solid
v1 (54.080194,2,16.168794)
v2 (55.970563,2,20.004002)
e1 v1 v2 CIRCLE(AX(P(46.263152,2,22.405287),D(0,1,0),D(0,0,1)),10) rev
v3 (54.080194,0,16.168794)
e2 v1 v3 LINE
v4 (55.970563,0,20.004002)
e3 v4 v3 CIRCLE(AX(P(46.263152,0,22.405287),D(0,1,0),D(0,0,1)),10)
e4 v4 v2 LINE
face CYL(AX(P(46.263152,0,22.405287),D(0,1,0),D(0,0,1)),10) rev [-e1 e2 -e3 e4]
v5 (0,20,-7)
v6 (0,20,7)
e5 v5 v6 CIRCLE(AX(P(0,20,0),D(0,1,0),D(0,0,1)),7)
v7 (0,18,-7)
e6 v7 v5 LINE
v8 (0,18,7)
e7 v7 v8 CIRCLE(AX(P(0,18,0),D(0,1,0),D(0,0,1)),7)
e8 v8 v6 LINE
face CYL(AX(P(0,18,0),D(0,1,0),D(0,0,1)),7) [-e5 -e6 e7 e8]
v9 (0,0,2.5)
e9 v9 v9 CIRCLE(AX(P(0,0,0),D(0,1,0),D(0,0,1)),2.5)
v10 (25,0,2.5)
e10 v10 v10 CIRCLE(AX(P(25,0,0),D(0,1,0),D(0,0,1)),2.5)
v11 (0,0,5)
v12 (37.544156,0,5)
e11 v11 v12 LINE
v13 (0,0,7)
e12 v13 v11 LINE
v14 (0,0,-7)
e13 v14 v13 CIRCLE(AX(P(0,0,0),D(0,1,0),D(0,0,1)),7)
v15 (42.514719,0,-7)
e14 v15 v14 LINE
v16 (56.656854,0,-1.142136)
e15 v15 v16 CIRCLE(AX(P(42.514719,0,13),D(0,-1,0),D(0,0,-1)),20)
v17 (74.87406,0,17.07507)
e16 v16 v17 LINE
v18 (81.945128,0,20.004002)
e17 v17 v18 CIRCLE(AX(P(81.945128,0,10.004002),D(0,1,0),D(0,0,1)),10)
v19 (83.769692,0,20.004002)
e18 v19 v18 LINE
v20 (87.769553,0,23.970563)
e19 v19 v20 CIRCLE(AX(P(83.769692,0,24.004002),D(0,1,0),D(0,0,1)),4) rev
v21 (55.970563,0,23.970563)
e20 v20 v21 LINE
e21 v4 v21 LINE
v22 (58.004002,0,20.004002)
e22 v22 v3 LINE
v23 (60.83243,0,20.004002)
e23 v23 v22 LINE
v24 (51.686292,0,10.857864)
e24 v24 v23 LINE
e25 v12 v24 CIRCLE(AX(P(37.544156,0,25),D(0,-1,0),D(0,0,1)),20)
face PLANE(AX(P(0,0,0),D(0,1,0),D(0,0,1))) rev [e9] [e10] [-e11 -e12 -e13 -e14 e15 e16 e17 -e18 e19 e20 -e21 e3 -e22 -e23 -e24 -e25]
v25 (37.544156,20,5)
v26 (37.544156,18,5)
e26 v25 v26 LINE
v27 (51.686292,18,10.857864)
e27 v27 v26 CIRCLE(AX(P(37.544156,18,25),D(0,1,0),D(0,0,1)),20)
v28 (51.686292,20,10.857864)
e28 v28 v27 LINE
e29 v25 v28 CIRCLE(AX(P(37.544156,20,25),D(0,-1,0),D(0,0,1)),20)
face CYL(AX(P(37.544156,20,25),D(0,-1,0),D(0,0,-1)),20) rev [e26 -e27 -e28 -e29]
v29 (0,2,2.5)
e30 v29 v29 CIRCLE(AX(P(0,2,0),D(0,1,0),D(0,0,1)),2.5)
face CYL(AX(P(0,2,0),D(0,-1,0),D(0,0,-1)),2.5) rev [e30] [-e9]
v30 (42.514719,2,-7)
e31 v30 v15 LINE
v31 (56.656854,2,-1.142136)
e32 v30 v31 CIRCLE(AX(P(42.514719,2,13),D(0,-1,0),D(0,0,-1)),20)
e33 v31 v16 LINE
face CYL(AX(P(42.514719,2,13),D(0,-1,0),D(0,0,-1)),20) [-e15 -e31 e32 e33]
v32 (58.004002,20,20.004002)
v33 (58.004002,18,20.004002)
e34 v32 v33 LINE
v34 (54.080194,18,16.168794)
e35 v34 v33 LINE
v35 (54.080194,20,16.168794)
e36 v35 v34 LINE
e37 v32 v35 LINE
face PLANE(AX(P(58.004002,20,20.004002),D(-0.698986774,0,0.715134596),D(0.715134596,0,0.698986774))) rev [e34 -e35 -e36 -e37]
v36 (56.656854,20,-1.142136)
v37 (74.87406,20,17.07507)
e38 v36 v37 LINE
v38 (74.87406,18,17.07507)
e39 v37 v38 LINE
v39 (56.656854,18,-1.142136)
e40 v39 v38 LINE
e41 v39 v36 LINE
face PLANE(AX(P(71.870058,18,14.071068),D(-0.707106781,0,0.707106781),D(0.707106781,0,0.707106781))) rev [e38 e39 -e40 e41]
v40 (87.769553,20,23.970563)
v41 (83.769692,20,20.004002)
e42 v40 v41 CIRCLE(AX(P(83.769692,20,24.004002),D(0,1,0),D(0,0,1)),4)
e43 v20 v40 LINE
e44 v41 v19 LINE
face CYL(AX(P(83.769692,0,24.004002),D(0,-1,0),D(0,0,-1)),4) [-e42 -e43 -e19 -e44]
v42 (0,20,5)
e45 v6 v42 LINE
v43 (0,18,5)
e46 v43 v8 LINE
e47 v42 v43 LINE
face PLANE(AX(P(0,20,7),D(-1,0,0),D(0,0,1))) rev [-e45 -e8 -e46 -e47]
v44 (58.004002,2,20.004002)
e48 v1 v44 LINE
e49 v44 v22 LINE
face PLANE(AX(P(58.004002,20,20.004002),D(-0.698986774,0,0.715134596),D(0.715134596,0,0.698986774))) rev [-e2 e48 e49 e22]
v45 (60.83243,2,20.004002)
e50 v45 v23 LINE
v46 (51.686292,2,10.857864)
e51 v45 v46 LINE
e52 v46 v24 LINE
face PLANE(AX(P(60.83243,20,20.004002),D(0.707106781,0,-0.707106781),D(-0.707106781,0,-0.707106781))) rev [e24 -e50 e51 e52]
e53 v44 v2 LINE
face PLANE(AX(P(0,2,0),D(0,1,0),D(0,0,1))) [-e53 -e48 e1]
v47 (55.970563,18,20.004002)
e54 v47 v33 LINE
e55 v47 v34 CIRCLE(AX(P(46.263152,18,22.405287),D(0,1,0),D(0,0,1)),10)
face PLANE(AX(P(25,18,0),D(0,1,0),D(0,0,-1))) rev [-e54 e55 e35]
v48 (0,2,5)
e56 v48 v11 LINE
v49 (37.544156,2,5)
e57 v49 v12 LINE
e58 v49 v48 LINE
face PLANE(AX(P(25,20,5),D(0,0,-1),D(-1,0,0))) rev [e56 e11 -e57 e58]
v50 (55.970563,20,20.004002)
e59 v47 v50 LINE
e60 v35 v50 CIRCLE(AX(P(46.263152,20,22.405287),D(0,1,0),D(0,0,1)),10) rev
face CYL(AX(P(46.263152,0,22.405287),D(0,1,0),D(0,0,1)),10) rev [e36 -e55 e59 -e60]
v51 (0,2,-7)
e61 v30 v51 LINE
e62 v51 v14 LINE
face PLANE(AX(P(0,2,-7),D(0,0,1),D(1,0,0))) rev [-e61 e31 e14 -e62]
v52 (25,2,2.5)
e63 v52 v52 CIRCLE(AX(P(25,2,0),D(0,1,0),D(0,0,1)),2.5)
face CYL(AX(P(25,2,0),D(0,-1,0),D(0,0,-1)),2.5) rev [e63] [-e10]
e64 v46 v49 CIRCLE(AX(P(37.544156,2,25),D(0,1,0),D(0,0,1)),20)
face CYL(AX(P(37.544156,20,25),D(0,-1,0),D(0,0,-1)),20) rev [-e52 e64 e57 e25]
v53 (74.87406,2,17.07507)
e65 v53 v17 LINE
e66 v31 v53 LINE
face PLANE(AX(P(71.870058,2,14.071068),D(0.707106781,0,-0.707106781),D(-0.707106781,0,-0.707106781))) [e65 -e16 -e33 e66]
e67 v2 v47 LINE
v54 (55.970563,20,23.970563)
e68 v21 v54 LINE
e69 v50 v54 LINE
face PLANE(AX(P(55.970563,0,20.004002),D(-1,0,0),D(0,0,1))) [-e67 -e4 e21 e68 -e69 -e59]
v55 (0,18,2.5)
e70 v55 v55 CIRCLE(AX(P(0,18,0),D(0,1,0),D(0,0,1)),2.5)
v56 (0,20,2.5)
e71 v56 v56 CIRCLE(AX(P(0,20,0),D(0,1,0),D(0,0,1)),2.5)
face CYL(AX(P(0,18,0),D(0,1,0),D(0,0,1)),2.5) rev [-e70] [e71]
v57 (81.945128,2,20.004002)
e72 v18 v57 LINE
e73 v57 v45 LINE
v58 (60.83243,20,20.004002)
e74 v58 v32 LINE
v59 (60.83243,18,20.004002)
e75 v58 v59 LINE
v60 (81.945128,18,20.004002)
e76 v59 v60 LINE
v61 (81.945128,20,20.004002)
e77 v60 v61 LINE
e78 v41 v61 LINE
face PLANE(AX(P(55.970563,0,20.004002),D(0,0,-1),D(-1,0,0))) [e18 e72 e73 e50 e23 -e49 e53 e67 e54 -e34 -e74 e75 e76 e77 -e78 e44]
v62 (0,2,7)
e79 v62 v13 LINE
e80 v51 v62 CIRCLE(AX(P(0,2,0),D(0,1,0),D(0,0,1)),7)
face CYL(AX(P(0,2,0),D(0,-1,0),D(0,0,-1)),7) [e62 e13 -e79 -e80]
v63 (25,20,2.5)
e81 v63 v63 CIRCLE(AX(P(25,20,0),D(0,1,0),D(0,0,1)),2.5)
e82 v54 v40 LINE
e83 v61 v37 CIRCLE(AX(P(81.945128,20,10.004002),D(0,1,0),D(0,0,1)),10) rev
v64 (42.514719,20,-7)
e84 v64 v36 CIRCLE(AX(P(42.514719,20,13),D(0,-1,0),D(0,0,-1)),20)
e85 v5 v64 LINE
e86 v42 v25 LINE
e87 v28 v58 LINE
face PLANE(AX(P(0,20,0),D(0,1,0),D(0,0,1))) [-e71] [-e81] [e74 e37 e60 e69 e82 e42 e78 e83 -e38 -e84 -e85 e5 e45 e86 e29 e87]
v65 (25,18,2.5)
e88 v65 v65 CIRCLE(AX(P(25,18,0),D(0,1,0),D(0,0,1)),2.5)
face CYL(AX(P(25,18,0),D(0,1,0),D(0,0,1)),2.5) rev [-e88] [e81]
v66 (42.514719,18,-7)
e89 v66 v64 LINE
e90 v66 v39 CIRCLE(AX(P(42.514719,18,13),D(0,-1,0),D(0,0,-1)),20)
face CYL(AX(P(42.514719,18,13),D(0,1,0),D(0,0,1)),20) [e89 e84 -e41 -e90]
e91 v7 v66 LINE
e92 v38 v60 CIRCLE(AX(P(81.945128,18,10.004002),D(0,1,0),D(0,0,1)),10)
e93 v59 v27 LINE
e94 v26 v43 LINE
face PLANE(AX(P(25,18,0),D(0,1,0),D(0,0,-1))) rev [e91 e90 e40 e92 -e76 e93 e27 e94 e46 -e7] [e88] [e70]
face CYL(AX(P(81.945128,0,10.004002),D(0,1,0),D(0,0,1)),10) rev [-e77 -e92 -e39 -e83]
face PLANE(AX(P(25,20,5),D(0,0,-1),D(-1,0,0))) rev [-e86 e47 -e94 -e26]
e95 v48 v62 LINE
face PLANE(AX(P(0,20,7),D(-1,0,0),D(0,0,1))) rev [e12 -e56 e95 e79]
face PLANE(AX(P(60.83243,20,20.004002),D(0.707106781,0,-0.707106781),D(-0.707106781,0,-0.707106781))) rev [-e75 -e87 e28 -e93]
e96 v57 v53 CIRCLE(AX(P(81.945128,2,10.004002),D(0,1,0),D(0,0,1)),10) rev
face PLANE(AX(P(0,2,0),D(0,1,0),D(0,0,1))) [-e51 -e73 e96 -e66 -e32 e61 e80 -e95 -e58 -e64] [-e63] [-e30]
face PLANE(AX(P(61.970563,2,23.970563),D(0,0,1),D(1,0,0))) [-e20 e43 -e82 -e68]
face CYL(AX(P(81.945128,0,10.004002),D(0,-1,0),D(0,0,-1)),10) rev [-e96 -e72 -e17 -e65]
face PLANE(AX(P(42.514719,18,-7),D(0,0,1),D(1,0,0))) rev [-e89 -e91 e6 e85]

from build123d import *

# Parameters (mm, degrees)
SKETCH1_R                = 2.5
BOSS_EXTRUDE1_DEPTH      = 2
BOSS_EXTRUDE2_DEPTH      = 2
BOSS_EXTRUDE3_DEPTH      = 18
BOSS_EXTRUDE3_DEPTH_BACK = 2
SKETCH4_W                = 31.798989874
SKETCH4_H                = 3.966560298
BOSS_EXTRUDE5_START      = -2
SKETCH6_R                = 2.5
BOSS_EXTRUDE5_DEPTH      = 2
FILLET1_R                = 10
FILLET2_R                = 10
FILLET4_R                = 4
CUT_EXTRUDE1_DEPTH       = 94.156093248


with BuildPart() as part:
    # Sketch1 → Boss-Extrude1 (new body)
    with BuildSketch(Plane(origin=(0, 0, 0), x_dir=(1, 0, 0), z_dir=(0, 1, 0))):
        with BuildLine():
            Line((0, 7), (25, 7))
            ThreePointArc((25, 7), (32, 0), (25, -7))
            Line((25, -7), (0, -7))
            ThreePointArc((0, -7), (-7, 0), (0, 7))
        make_face()
        with Locations(Location((0, 0, 0), (0, 0, 270))):
            Circle(SKETCH1_R, mode=Mode.SUBTRACT)
        with Locations(Location((25, 0, 0), (0, 0, 270))):
            Circle(SKETCH1_R, mode=Mode.SUBTRACT)
    extrude(amount=BOSS_EXTRUDE1_DEPTH)

    # Sketch3 → Boss-Extrude2 (add)
    with BuildSketch(Plane(origin=(0, 0, 0), x_dir=(-1, 0, 0), z_dir=(0, -1, 0))):
        with BuildLine():
            Line((-25, -7), (-36.715728753, -7))
            ThreePointArc((-36.715728753, -7), (-44.3693974, -8.52240935), (-50.857864376, -12.857864376))
            Line((-50.857864376, -12.857864376), (-61.970562748, -23.970562748))
            Line((-61.970562748, -23.970562748), (-81.769552622, -23.970562748))
            Line((-81.769552622, -23.970562748), (-71.870057685, -14.071067812))
            Line((-71.870057685, -14.071067812), (-56.656854249, 1.142135624))
            ThreePointArc((-56.656854249, 1.142135624), (-50.168387273, 5.47759065), (-42.514718626, 7))
            Line((-42.514718626, 7), (-25, 7))
            ThreePointArc((-25, 7), (-32, 0), (-25, -7))
        make_face()
    boss_extrude2 = extrude(amount=-BOSS_EXTRUDE2_DEPTH)

    # Sketch4 → Boss-Extrude3 (add, two sides: drawn at the far end of the back side and taken through both)
    with BuildSketch(Plane(origin=(0, 2, 0), x_dir=(1, 0, 0), z_dir=(0, 1, 0)).offset(-BOSS_EXTRUDE3_DEPTH_BACK)):
        with Locations((71.870057685, -21.987282599)):
            Rectangle(SKETCH4_W, SKETCH4_H)
    extrude(amount=BOSS_EXTRUDE3_DEPTH + BOSS_EXTRUDE3_DEPTH_BACK)

    # Mirror1: Boss-Extrude2 across plane
    add(boss_extrude2.mirror(Plane.ZX.offset(10)))

    # Sketch6 → Boss-Extrude5 (add)
    with BuildSketch(Plane(origin=(0, 20, 0), x_dir=(1, 0, 0), z_dir=(0, 1, 0)).offset(BOSS_EXTRUDE5_START)):
        with BuildLine():
            Line((25, -7), (0, -7))
            ThreePointArc((0, -7), (-7, 0), (0, 7))
            Line((0, 7), (25, 7))
            ThreePointArc((25, 7), (32, 0), (25, -7))
        make_face()
        with Locations(Location((0, 0, 0), (0, 0, 270))):
            Circle(SKETCH6_R, mode=Mode.SUBTRACT)
        with Locations(Location((25, 0, 0), (0, 0, 270))):
            Circle(SKETCH6_R, mode=Mode.SUBTRACT)
    extrude(amount=BOSS_EXTRUDE5_DEPTH)

    # Fillet1
    # the kernel refuses this fillet: 10 mm, written as the material it adds along each edge
    with BuildSketch(Plane(origin=(58.00400245, 0, 20.00400245), x_dir=(-1, 0, 0), z_dir=(0, 1, 0)), Plane(origin=(58.00400245, 18, 20.00400245), x_dir=(-1, 0, 0), z_dir=(0, 1, 0))) as fillet1_piece_1:
        with BuildLine():
            CenterArc((11.740850866, 2.401284758), FILLET1_R, 193.894123227, 31.105876773)
            Line((4.669783054, -4.669783054), (0, 0))
            Line((0, 0), (2.033439702, 0))
        make_face()
    extrude(amount=2)
    with BuildSketch(Plane(origin=(58.00400245, -16.510176322, 20.00400245), x_dir=(-1, 0, 0), z_dir=(0, 1, 0))) as fillet1_piece_2_section:
        with BuildLine():
            CenterArc((11.740850866, 2.401284758), FILLET1_R, 193.894123227, 31.105876773)
            Line((4.669783054, -4.669783054), (0, 0))
            Line((0, 0), (2.033439702, 0))
        make_face()
    fillet1_piece_2 = extrude(amount=35.020352644, mode=Mode.PRIVATE)
    fillet1_piece_2 = split(fillet1_piece_2, bisect_by=Plane(origin=(54.988670777, 18, 17.479262968), z_dir=(0, 1, 0)), keep=Keep.TOP, mode=Mode.PRIVATE)
    add(fillet1_piece_2)
    with BuildSketch(Plane(origin=(58.00400245, 1.489823678, 20.00400245), x_dir=(-1, 0, 0), z_dir=(0, 1, 0))) as fillet1_piece_3_section:
        with BuildLine():
            CenterArc((11.740850866, 2.401284758), FILLET1_R, 193.894123227, 31.105876773)
            Line((4.669783054, -4.669783054), (0, 0))
            Line((0, 0), (2.033439702, 0))
        make_face()
    fillet1_piece_3 = extrude(amount=35.020352644, mode=Mode.PRIVATE)
    fillet1_piece_3 = split(fillet1_piece_3, bisect_by=Plane(origin=(54.988670777, 2, 17.479262968), z_dir=(0, -1, 0)), keep=Keep.TOP, mode=Mode.PRIVATE)
    add(fillet1_piece_3)

    # Fillet2
    fillet2_edges = [part.edges().sort_by_distance(p)[0] for p in [
        (77.802992324, 1, 20.00400245),
        (77.802992324, 19, 20.00400245),
    ]]
    fillet(fillet2_edges, radius=FILLET2_R)

    # Fillet4
    # the kernel refuses this fillet: 4 mm, written as the material it takes off along each edge
    with BuildSketch(Plane(origin=(87.769552622, 30, 20.00400245), x_dir=(0, 0, 1), z_dir=(0, -1, 0))) as fillet4_piece_1:
        with BuildLine():
            CenterArc((FILLET4_R, FILLET4_R), FILLET4_R, 180, 90)
            Line((0, FILLET4_R), (0, 0))
            Line((0, 0), (FILLET4_R, 0))
        make_face()
    extrude(amount=40, mode=Mode.SUBTRACT)

    # Sketch8 → Cut-Extrude1 (cut, through all)
    with BuildSketch(Plane.XZ):
        with BuildLine():
            Line((0, 5), (25, 5))
            Line((25, 5), (37.544155877, 5))
            ThreePointArc((37.544155877, 5), (45.197824525, 6.52240935), (51.686291501, 10.857864376))
            Line((51.686291501, 10.857864376), (60.832429575, 20.00400245))
            Line((60.832429575, 20.00400245), (58.00400245, 20.00400245))
            Line((58.00400245, 20.00400245), (50.528510621, 12.697308088))
            ThreePointArc((50.528510621, 12.697308088), (44.096826604, 8.479014089), (36.548775141, 7))
            Line((36.548775141, 7), (0, 7))
            Line((0, 7), (0, 5))
        make_face()
    extrude(amount=-CUT_EXTRUDE1_DEPTH, mode=Mode.SUBTRACT)


solid = part.part
